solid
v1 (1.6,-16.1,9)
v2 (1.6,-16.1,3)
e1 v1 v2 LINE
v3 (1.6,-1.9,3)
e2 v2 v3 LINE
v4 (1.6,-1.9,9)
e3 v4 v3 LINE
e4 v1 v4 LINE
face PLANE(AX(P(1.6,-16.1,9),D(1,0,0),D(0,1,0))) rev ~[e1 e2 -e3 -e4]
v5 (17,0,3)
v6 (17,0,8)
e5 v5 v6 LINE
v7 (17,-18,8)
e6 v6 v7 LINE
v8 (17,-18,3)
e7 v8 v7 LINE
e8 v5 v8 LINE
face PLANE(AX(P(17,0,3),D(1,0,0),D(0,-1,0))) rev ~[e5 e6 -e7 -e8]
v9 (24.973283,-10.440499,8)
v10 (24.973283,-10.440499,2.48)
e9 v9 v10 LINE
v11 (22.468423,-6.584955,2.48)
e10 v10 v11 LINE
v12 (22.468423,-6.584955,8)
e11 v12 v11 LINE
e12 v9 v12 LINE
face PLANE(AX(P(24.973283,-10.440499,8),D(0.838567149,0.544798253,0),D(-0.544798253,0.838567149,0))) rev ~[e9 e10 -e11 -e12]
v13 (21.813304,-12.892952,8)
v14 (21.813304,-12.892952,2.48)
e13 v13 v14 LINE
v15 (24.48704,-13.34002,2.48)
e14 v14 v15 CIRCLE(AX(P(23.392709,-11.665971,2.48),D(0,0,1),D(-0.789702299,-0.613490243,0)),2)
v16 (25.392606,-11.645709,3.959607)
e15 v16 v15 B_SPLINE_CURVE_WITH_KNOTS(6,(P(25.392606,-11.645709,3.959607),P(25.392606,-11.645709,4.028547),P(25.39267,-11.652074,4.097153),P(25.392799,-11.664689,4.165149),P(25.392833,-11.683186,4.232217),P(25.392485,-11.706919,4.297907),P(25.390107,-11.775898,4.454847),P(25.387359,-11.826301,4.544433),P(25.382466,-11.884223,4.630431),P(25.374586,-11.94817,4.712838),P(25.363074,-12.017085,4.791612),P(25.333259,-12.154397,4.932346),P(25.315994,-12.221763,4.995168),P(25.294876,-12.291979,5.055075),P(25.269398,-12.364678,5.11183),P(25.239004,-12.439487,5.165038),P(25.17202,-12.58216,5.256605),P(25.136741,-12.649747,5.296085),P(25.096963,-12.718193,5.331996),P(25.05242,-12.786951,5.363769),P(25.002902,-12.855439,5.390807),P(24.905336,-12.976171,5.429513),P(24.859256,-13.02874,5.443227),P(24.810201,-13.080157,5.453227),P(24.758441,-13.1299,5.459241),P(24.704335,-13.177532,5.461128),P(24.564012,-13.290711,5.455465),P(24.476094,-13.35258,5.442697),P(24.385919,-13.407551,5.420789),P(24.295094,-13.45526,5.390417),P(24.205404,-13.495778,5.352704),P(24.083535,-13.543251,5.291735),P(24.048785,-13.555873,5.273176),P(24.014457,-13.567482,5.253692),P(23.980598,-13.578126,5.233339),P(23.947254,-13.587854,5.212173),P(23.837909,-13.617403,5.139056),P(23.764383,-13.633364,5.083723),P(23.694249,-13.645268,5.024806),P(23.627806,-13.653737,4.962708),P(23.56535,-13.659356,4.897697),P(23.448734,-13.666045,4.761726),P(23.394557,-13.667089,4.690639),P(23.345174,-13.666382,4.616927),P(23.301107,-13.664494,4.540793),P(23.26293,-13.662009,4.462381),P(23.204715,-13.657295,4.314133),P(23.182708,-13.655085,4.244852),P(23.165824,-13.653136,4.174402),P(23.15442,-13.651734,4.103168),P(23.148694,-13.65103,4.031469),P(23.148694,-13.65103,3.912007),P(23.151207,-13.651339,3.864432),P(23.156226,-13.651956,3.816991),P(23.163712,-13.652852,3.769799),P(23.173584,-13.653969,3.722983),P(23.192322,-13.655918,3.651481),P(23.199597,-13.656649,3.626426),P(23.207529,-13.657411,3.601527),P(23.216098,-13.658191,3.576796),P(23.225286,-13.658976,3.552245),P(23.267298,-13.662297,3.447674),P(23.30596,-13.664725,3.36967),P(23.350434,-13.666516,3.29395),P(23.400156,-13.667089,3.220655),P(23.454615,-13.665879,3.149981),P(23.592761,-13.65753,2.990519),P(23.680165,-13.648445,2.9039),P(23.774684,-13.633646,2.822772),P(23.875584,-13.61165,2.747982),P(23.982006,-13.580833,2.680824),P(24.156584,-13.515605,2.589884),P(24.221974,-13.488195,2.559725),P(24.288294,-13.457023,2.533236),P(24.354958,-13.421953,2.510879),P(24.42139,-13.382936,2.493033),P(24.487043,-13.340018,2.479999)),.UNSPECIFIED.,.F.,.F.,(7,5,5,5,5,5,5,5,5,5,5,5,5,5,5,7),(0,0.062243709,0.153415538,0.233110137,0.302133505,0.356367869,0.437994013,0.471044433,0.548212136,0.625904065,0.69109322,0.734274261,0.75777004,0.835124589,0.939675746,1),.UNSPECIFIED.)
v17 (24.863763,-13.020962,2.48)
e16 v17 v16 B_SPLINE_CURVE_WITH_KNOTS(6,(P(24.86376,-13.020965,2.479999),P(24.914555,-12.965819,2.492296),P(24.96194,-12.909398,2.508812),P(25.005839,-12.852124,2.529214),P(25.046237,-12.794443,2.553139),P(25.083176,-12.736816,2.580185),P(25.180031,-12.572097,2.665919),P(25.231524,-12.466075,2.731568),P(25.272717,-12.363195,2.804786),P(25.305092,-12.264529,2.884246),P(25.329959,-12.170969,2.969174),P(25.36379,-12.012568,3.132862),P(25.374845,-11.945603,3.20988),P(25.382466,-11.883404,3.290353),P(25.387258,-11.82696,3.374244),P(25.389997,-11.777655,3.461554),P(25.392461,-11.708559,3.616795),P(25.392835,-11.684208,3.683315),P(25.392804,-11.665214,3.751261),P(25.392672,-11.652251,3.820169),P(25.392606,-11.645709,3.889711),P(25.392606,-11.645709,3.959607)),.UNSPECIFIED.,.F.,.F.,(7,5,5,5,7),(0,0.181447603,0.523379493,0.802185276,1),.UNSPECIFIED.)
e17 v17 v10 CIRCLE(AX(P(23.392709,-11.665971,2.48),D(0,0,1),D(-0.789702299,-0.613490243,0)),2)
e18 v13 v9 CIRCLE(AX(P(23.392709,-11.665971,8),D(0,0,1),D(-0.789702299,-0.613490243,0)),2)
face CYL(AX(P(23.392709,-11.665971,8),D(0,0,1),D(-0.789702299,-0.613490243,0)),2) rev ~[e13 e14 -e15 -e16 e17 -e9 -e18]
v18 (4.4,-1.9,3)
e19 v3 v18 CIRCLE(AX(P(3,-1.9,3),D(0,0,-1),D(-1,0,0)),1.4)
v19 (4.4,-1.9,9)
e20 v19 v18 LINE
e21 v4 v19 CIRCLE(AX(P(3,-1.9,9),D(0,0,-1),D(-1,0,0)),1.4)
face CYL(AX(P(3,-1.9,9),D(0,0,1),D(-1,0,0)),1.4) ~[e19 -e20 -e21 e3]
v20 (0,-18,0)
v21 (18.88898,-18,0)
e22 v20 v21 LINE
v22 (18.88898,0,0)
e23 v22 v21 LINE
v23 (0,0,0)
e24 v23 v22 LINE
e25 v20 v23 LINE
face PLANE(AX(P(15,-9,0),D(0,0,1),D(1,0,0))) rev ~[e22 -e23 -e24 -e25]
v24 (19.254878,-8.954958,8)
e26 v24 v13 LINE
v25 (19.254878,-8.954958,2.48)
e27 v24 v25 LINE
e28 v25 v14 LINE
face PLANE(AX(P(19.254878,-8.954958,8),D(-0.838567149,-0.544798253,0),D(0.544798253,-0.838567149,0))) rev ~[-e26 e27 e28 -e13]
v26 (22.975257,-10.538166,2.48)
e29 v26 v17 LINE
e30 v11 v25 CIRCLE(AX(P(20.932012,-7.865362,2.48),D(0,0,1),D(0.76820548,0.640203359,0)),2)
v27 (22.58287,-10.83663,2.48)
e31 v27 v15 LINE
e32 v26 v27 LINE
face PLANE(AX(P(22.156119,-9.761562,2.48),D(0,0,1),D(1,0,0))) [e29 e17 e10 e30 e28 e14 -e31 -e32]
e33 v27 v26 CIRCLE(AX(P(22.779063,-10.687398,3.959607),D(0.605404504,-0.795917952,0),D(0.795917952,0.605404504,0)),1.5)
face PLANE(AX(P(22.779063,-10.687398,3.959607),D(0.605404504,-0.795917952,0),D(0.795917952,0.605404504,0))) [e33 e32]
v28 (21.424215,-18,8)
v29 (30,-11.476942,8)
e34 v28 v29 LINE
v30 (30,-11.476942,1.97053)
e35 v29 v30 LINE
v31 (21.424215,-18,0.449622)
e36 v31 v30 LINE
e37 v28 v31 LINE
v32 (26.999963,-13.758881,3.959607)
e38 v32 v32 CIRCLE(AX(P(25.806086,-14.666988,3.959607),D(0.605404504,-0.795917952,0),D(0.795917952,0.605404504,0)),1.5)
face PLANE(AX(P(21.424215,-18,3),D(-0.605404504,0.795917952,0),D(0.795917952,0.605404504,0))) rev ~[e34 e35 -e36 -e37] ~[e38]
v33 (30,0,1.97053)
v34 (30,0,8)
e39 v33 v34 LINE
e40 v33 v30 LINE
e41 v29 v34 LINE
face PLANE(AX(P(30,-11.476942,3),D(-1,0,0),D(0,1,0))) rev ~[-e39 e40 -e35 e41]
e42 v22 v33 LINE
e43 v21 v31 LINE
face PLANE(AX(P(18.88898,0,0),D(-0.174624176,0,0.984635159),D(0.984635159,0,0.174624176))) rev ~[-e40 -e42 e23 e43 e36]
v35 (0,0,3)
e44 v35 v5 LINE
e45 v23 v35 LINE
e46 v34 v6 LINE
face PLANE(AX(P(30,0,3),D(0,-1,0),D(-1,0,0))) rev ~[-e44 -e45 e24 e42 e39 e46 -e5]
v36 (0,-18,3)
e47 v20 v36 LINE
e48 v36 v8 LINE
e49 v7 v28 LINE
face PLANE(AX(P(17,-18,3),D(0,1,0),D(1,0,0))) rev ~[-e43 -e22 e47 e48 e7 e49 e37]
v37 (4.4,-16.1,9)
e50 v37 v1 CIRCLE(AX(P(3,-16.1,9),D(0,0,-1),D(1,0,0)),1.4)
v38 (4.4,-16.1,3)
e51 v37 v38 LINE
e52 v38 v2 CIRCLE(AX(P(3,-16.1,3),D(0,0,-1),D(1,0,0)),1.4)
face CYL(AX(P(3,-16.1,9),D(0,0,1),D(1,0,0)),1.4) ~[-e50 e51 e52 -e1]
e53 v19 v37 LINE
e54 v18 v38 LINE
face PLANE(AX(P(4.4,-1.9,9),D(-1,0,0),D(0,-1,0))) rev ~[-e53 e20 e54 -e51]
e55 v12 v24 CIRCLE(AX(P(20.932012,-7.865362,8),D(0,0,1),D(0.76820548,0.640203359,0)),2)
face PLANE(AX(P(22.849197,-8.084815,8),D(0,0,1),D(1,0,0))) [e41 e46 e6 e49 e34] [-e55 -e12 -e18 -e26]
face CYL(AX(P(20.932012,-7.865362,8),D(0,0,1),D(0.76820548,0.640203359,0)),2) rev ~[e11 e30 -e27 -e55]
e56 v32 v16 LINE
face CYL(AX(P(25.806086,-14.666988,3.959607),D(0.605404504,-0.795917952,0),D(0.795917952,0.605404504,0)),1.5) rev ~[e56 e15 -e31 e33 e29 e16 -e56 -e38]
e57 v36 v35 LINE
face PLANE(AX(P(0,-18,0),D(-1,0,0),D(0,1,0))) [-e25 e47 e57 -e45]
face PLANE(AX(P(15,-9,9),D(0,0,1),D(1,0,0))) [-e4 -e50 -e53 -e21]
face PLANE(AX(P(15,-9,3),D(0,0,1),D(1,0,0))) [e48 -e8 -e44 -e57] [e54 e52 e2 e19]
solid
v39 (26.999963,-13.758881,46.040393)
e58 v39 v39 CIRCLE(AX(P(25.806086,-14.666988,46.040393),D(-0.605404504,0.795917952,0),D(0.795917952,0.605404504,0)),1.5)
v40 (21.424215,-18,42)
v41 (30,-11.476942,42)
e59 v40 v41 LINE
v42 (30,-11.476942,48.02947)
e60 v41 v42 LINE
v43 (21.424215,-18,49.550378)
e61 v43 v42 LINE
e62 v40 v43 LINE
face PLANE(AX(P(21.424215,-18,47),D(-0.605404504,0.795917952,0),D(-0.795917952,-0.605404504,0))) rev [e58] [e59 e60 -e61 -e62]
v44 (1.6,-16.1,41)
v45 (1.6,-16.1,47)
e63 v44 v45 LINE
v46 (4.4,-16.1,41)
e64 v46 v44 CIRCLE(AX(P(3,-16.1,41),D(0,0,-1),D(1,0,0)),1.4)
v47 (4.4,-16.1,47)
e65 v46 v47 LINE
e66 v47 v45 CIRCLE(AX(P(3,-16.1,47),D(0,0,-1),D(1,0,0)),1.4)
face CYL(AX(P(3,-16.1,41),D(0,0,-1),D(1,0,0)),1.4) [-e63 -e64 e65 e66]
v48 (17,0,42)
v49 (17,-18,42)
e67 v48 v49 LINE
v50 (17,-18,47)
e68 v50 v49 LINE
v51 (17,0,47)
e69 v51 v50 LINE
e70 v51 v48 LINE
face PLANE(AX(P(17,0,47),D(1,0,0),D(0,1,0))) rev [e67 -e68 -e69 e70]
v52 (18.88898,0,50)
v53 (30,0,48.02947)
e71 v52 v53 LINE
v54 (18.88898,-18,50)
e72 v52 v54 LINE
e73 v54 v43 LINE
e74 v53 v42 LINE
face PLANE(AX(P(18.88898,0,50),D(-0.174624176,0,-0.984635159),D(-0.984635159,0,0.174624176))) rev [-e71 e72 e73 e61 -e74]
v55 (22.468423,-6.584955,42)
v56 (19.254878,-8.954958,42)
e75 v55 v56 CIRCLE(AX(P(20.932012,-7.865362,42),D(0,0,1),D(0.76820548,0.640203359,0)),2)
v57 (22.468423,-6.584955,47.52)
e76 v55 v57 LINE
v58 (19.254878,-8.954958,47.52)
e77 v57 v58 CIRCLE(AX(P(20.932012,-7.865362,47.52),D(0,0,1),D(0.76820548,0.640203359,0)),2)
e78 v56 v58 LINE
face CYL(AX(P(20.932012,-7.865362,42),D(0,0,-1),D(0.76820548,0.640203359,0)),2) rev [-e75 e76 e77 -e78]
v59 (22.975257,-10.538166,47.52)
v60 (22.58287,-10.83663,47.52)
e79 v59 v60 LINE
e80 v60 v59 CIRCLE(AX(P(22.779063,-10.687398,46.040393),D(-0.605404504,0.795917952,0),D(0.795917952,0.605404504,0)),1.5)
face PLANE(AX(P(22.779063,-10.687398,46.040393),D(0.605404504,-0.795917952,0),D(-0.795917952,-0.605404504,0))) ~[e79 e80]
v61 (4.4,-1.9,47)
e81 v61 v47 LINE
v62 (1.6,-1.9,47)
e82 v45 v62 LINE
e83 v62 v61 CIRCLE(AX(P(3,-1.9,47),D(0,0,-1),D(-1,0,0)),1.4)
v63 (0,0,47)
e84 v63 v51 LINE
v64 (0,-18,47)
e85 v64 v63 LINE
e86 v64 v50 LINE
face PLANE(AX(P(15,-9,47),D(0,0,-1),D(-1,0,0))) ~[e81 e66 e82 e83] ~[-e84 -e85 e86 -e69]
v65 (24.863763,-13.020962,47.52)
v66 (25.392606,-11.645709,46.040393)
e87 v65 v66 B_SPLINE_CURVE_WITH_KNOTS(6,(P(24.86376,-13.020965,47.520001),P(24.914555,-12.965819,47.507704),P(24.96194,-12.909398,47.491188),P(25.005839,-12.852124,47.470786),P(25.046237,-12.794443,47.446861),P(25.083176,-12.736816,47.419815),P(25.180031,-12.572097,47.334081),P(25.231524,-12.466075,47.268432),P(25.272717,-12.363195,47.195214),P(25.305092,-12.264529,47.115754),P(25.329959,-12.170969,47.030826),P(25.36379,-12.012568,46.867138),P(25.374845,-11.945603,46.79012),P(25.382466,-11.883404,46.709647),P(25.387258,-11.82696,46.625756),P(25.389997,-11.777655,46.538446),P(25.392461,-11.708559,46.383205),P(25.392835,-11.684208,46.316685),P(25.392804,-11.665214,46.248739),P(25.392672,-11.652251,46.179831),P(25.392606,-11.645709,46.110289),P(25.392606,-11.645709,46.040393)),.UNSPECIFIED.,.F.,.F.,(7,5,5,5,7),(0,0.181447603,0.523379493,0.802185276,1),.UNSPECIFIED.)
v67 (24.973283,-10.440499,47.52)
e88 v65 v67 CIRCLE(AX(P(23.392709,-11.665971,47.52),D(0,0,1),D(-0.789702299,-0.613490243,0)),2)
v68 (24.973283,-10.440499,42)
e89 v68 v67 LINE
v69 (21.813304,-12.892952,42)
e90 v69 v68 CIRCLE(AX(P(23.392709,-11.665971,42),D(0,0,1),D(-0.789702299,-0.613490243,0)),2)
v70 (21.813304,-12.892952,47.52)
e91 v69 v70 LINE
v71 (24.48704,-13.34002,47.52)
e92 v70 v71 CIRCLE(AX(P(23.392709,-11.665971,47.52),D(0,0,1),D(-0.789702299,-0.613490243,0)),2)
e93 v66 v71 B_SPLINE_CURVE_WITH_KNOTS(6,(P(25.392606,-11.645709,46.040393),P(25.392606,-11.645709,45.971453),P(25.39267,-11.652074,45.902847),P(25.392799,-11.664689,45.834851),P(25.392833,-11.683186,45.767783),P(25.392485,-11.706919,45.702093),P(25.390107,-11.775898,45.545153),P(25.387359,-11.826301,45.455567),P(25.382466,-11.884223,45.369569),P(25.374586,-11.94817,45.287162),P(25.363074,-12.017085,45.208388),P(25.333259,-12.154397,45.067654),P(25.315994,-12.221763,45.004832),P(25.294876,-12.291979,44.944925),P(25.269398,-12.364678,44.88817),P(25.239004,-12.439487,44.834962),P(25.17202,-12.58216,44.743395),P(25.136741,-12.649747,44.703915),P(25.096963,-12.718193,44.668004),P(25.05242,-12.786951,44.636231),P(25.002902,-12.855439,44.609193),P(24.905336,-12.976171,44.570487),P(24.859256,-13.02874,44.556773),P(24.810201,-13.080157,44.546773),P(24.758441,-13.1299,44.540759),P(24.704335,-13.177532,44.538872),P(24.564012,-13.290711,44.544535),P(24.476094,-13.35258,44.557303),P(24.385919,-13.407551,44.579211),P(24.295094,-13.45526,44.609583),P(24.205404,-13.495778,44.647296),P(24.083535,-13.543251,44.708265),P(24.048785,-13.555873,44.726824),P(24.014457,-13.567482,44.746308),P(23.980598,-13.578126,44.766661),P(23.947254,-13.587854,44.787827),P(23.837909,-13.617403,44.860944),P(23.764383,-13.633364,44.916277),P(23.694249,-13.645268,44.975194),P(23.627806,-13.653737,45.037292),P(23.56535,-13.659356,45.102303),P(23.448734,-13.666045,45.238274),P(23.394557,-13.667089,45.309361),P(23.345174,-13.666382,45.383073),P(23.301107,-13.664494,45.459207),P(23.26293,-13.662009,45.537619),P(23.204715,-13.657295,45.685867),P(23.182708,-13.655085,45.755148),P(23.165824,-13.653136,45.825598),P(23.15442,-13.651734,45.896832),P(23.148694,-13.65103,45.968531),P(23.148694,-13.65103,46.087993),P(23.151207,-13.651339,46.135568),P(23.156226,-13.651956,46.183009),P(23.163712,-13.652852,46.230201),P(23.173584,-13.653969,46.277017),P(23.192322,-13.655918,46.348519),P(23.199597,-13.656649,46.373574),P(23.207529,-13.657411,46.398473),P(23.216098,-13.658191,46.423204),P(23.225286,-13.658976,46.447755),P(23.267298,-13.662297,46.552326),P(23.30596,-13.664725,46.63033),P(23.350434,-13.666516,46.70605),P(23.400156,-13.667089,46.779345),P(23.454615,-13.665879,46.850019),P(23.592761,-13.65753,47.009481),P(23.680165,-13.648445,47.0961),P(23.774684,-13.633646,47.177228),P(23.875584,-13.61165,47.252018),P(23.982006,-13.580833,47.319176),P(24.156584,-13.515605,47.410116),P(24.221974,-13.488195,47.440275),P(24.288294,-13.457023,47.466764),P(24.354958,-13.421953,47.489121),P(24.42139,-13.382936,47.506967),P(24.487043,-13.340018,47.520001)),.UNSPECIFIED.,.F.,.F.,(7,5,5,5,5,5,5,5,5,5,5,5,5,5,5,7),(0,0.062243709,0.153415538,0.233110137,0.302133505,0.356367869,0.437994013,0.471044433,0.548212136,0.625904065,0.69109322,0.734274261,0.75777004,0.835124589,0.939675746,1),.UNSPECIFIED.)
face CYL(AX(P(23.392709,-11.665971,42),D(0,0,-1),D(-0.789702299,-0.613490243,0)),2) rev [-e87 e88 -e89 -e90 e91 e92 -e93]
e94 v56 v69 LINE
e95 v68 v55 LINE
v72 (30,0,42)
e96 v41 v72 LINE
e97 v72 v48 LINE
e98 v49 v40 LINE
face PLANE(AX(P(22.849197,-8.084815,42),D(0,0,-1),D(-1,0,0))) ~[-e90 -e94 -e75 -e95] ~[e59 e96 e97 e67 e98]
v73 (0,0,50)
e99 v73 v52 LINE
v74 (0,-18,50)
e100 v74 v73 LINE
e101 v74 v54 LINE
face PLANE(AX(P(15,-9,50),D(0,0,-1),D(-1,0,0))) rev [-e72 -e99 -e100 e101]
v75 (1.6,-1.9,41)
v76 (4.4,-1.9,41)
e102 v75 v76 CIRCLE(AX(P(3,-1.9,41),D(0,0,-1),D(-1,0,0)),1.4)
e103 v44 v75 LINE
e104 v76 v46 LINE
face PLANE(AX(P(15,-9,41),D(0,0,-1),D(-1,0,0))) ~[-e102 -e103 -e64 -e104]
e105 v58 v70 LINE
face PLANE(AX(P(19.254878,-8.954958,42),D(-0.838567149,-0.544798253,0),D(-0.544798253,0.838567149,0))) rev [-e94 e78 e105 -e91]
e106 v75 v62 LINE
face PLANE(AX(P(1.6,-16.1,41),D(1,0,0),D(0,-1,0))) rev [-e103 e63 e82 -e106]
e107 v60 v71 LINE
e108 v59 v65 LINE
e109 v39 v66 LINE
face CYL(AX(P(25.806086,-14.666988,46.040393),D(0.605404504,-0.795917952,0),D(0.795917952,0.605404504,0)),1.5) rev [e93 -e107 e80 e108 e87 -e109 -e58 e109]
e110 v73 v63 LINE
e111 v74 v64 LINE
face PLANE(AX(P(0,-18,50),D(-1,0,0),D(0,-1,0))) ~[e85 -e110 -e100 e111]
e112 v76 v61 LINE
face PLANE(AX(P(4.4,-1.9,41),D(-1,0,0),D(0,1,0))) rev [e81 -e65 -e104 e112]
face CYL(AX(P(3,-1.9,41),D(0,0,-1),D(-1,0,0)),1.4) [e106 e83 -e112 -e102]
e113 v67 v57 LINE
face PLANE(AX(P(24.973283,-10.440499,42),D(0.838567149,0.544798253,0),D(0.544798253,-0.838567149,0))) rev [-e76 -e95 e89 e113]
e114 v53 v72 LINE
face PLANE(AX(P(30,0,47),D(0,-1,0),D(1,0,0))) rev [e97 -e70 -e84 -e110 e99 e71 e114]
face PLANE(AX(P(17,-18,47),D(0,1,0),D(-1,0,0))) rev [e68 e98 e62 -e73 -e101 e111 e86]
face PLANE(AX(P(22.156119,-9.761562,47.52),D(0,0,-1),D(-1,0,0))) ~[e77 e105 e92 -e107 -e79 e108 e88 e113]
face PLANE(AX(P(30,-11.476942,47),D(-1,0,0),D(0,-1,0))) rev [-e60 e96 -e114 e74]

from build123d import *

# Parameters (mm, degrees)
F0_W      = 30
F0_H      = 18
F1_DEPTH  = 9
F2_W      = 30
F2_H      = 18
F3_DEPTH  = 6
F5_DEPTH  = 25
F7_DEPTH  = 5
F8_R      = 1.5
F9_DEPTH  = 5
F11_DEPTH = 5.52
F13_DEPTH = 25


with BuildPart() as f1:
    # F0 (on Top) → F1 (new body)
    with BuildSketch(Plane.XY):
        with Locations((15, -9)):
            Rectangle(F0_W, F0_H)
    extrude(amount=F1_DEPTH)

    # F2 (on face) → F3 (cut)
    with BuildSketch(Plane.XY.offset(9)):
        with Locations((15, -9)):
            Rectangle(F2_W, F2_H)
        with BuildLine():
            ThreePointArc((1.6, -1.9), (3, -0.5), (4.4, -1.9))
            Line((4.4, -1.9), (4.4, -16.1))
            ThreePointArc((4.4, -16.1), (3, -17.5), (1.6, -16.1))
            Line((1.6, -16.1), (1.6, -1.9))
        make_face(mode=Mode.SUBTRACT)
    extrude(amount=-F3_DEPTH, mode=Mode.SUBTRACT)

    # F4 (on face) → F5 (cut)
    with BuildSketch(Plane.XY.offset(3)):
        Polygon((30, -11.476942338), (21.424215287, -18), (30, -18), align=None)
    extrude(amount=-F5_DEPTH, mode=Mode.SUBTRACT)

    # F6 (on face) → F7 (join)
    with BuildSketch(Plane.XY.offset(3)):
        Polygon((30, -11.476942338), (30, 0), (17, 0), (17, -11.476942338), (17, -18), (21.424215287, -18), align=None)
    extrude(amount=F7_DEPTH)

    # F8 (on face) → F9 (cut)
    with BuildSketch(Plane(origin=(16.5256296321, -21.7260446429, 0), x_dir=(0.7959179518, 0.6054045044, 0), z_dir=(0.6054045044, -0.7959179518, 0))):
        with Locations((11.6600664333, 3.9596073329)):
            Circle(F8_R)
    extrude(amount=-F9_DEPTH, mode=Mode.SUBTRACT)

    # F10 (on face) → F11 (cut)
    with BuildSketch(Plane.XY.offset(8)):
        with BuildLine():
            Line((19.254878048, -8.9549584287), (21.8133040316, -12.8929519365))
            ThreePointArc((21.8133040316, -12.8929519365), (24.6189354383, -13.2459612648), (24.9732833017, -10.4404985993))
            Line((24.9732833017, -10.4404985993), (22.4684233059, -6.584955205))
            ThreePointArc((22.4684233059, -6.584955205), (19.7449236449, -6.2557593582), (19.254878048, -8.9549584287))
        make_face()
    extrude(amount=-F11_DEPTH, mode=Mode.SUBTRACT)

    # F12 (on face) → F13 (cut)
    with BuildSketch(Plane(origin=(0, 0, 0), x_dir=(-1, 0, 0), z_dir=(0, 1, 0))):
        Polygon((-18.8889801502, 0), (-30, 1.9705295563), (-30, 0), align=None)
    extrude(amount=-F13_DEPTH, mode=Mode.SUBTRACT)


with BuildPart() as f15_1:
    # F15: instance of F1
    add(f1.part.mirror(Plane.XY.offset(25)))


solid = Compound([f1.part, f15_1.part])
